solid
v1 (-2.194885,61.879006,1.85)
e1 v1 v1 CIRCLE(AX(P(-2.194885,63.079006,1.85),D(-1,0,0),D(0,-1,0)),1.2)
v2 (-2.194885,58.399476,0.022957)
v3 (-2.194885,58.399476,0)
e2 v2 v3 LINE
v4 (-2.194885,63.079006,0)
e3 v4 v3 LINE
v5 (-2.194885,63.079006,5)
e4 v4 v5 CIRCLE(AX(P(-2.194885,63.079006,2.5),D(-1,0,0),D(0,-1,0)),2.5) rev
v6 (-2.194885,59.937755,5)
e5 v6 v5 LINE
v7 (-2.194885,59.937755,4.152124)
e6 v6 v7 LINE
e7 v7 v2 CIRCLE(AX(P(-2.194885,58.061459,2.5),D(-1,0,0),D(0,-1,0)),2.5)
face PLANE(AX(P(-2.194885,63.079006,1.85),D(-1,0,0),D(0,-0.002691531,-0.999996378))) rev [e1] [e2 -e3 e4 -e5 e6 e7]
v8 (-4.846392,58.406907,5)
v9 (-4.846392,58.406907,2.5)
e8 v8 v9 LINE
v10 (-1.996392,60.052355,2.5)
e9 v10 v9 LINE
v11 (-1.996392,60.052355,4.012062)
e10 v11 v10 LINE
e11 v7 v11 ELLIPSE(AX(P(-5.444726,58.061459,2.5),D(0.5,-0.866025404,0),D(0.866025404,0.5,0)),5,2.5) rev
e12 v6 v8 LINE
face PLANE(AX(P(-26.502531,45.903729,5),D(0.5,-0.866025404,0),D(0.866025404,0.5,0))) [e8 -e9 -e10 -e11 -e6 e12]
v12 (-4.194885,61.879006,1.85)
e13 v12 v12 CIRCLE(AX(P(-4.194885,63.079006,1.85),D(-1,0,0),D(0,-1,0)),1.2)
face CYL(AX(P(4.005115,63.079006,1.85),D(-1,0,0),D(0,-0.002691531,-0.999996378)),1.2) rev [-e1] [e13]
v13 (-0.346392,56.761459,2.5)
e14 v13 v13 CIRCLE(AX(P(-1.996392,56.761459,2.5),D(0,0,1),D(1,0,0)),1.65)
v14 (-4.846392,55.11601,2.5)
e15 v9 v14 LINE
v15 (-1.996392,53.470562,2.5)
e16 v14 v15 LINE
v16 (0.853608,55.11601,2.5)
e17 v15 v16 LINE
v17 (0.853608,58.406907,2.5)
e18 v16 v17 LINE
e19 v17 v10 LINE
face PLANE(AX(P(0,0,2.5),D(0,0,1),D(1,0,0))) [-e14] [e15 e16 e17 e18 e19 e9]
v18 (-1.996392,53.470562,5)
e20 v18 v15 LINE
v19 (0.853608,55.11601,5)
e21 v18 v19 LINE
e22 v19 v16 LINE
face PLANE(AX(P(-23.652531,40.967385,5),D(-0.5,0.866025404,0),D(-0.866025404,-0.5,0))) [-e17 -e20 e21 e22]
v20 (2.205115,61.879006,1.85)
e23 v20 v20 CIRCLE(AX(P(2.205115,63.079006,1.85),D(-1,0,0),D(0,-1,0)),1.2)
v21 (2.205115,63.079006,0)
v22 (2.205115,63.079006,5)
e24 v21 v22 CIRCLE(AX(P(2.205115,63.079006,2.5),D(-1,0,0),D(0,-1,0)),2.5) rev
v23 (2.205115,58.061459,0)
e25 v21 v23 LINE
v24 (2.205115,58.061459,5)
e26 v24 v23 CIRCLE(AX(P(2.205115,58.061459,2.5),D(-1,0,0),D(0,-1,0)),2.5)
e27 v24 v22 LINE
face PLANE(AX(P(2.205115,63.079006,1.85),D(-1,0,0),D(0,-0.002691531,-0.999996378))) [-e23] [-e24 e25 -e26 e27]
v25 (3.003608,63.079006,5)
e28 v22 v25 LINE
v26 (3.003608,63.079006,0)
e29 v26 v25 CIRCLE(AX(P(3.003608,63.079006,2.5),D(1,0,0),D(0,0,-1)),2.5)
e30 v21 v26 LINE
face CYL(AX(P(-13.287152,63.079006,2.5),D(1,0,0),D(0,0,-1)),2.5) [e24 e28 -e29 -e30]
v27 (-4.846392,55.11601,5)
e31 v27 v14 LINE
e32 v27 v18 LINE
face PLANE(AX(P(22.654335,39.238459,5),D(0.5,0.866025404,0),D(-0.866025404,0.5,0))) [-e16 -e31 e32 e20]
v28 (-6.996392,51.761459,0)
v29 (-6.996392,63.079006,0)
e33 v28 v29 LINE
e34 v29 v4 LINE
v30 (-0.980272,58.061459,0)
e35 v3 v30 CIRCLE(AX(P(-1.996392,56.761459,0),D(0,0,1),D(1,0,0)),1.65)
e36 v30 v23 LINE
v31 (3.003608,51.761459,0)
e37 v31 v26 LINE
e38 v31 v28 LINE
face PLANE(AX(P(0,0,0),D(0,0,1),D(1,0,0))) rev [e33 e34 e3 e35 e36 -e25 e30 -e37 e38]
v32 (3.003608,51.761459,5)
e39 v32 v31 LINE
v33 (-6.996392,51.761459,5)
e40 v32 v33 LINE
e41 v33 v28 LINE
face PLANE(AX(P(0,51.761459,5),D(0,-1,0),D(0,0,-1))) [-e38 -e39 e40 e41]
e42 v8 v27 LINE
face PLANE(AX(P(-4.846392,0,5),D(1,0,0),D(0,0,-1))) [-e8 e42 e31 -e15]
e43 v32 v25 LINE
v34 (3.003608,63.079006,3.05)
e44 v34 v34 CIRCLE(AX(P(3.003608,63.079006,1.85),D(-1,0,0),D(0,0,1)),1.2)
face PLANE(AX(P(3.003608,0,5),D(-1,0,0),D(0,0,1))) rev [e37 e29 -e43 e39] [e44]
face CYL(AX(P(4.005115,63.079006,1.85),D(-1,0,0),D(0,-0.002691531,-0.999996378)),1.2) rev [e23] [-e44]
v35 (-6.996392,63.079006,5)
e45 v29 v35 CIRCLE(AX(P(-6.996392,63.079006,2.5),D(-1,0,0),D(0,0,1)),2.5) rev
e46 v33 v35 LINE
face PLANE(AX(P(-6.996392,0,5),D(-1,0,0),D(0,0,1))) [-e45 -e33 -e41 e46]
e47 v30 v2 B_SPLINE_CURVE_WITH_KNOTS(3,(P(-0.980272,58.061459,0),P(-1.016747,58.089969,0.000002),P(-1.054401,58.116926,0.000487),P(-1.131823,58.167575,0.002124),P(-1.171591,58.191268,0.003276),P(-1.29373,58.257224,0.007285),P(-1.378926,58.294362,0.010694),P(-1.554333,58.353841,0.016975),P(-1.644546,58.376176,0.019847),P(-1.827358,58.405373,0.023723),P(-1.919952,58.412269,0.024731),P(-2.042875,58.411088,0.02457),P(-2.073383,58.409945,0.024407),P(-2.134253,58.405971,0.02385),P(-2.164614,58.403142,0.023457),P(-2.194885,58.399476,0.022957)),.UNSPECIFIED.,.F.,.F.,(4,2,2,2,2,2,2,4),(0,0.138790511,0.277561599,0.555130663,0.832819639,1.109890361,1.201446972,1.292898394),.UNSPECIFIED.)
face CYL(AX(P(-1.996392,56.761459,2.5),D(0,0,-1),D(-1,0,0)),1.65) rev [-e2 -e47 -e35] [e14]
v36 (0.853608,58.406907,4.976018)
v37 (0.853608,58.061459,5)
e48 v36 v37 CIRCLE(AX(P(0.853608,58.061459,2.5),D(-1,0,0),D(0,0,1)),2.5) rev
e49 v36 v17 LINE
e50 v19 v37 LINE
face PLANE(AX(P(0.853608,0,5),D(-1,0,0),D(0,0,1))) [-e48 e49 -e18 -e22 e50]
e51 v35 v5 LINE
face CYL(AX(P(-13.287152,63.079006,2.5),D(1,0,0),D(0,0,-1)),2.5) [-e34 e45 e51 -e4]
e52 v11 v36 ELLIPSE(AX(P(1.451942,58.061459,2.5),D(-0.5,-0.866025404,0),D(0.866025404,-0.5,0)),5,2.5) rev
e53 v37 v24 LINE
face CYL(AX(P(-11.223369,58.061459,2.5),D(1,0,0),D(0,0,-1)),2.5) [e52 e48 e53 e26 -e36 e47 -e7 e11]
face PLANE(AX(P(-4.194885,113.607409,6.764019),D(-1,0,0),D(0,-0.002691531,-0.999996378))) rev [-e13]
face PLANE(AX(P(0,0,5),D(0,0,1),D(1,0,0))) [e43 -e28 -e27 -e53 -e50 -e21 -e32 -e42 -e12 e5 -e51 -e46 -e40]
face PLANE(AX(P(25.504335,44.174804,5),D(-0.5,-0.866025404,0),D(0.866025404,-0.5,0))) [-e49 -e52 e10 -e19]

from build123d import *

# Parameters (mm, degrees)
SKETCH_1_R          = 1.65
EXTRUDE_1_DEPTH     = 2.5
SKETCH_1_3_W        = 10
SKETCH_1_3_H        = 10
EXTRUDE_2_DEPTH     = 5
EXTRUDE_3_DEPTH     = 10
OTHER_START         = -2.194885141
OTHER_1_DEPTH       = 4.4
OTHER_START_2       = -4.194885141
OTHER_1_2_OUTLINE_R = 1.2
OTHER_1_2_DEPTH     = 7.198493548
CUT_EXTRUDE_START   = -9.201507
CUT_EXTRUDE_1_DEPTH = 4.400001


# Read off the part's stored shape, not the designer's step: Отступ1
with BuildPart() as part:
    # Эскиз1 → Бобышка-Вытянуть1 (new body)
    with BuildSketch(Plane.XY):
        Polygon((-4.846391593, 58.406906995), (-4.846391593, 55.11601046), (-1.996391593, 53.470562193), (0.853608407, 55.11601046), (0.853608407, 58.406906995), (-1.996391593, 60.052355262), align=None)
        with Locations((-1.996391593, 56.761458727)):
            Circle(SKETCH_1_R, mode=Mode.SUBTRACT)
    extrude(amount=EXTRUDE_1_DEPTH)

    # Эскиз1<3> → Бобышка-Вытянуть2 (add)
    with BuildSketch(Plane.XY):
        with Locations((-1.996391593, 56.761458727)):
            Rectangle(SKETCH_1_3_W, SKETCH_1_3_H)
        Polygon((-4.846391593, 55.11601046), (-1.996391593, 53.470562193), (0.853608407, 55.11601046), (0.853608407, 58.406906995), (-1.996391593, 60.052355262), (-4.846391593, 58.406906995), align=None, mode=Mode.SUBTRACT)
    extrude(amount=EXTRUDE_2_DEPTH)

    # Эскиз2 → Бобышка-Вытянуть3 (add)
    with BuildSketch(Plane(origin=(3.003608407, 0, 0), x_dir=(0, 0, -1), z_dir=(1, 0, 0))):
        with BuildLine():
            Line((0, 63.079006264), (0, 61.761458727))
            Line((0, 61.761458727), (-5, 61.761458727))
            Line((-5, 61.761458727), (-5, 63.079006264))
            ThreePointArc((-5, 63.079006264), (-2.5, 65.579006264), (0, 63.079006264))
        make_face()
    extrude(amount=-EXTRUDE_3_DEPTH)

    # Отступ1 outline → Отступ1 (cut)
    with BuildSketch(Plane.YZ.offset(OTHER_START)):
        with BuildLine():
            Line((65.153996838, 3.894422503), (63.084523903, 3.899992575))
            ThreePointArc((63.084523903, 3.899992575), (61.080242494, 2.30545954), (62.195830177, 0))
            Line((62.195830177, 0), (63.079006264, 0))
            ThreePointArc((63.079006264, 0), (65.285367098, 1.324427003), (65.153996838, 3.894422503))
        make_face()
    extrude(amount=OTHER_1_DEPTH, mode=Mode.SUBTRACT)

    # Other 1 2 outline → Other 1 2 (cut)
    with BuildSketch(Plane.YZ.offset(OTHER_START_2)):
        with Locations((63.079006264, 1.85)):
            Circle(OTHER_1_2_OUTLINE_R)
    extrude(amount=OTHER_1_2_DEPTH, mode=Mode.SUBTRACT)

    # Эскиз3 → Вырез-Вытянуть1 (cut)
    with BuildSketch(Plane.ZY.offset(6.996391593).offset(CUT_EXTRUDE_START)):
        with BuildLine():
            ThreePointArc((0, 58.061458727), (2.5, 60.561458727), (5, 58.061458727))
            Line((5, 58.061458727), (5, 63.079006264))
            ThreePointArc((5, 63.079006264), (2.5, 65.579006264), (0, 63.079006264))
            Line((0, 63.079006264), (0, 58.061458727))
        make_face()
    extrude(amount=CUT_EXTRUDE_1_DEPTH, mode=Mode.SUBTRACT)


solid = part.part
